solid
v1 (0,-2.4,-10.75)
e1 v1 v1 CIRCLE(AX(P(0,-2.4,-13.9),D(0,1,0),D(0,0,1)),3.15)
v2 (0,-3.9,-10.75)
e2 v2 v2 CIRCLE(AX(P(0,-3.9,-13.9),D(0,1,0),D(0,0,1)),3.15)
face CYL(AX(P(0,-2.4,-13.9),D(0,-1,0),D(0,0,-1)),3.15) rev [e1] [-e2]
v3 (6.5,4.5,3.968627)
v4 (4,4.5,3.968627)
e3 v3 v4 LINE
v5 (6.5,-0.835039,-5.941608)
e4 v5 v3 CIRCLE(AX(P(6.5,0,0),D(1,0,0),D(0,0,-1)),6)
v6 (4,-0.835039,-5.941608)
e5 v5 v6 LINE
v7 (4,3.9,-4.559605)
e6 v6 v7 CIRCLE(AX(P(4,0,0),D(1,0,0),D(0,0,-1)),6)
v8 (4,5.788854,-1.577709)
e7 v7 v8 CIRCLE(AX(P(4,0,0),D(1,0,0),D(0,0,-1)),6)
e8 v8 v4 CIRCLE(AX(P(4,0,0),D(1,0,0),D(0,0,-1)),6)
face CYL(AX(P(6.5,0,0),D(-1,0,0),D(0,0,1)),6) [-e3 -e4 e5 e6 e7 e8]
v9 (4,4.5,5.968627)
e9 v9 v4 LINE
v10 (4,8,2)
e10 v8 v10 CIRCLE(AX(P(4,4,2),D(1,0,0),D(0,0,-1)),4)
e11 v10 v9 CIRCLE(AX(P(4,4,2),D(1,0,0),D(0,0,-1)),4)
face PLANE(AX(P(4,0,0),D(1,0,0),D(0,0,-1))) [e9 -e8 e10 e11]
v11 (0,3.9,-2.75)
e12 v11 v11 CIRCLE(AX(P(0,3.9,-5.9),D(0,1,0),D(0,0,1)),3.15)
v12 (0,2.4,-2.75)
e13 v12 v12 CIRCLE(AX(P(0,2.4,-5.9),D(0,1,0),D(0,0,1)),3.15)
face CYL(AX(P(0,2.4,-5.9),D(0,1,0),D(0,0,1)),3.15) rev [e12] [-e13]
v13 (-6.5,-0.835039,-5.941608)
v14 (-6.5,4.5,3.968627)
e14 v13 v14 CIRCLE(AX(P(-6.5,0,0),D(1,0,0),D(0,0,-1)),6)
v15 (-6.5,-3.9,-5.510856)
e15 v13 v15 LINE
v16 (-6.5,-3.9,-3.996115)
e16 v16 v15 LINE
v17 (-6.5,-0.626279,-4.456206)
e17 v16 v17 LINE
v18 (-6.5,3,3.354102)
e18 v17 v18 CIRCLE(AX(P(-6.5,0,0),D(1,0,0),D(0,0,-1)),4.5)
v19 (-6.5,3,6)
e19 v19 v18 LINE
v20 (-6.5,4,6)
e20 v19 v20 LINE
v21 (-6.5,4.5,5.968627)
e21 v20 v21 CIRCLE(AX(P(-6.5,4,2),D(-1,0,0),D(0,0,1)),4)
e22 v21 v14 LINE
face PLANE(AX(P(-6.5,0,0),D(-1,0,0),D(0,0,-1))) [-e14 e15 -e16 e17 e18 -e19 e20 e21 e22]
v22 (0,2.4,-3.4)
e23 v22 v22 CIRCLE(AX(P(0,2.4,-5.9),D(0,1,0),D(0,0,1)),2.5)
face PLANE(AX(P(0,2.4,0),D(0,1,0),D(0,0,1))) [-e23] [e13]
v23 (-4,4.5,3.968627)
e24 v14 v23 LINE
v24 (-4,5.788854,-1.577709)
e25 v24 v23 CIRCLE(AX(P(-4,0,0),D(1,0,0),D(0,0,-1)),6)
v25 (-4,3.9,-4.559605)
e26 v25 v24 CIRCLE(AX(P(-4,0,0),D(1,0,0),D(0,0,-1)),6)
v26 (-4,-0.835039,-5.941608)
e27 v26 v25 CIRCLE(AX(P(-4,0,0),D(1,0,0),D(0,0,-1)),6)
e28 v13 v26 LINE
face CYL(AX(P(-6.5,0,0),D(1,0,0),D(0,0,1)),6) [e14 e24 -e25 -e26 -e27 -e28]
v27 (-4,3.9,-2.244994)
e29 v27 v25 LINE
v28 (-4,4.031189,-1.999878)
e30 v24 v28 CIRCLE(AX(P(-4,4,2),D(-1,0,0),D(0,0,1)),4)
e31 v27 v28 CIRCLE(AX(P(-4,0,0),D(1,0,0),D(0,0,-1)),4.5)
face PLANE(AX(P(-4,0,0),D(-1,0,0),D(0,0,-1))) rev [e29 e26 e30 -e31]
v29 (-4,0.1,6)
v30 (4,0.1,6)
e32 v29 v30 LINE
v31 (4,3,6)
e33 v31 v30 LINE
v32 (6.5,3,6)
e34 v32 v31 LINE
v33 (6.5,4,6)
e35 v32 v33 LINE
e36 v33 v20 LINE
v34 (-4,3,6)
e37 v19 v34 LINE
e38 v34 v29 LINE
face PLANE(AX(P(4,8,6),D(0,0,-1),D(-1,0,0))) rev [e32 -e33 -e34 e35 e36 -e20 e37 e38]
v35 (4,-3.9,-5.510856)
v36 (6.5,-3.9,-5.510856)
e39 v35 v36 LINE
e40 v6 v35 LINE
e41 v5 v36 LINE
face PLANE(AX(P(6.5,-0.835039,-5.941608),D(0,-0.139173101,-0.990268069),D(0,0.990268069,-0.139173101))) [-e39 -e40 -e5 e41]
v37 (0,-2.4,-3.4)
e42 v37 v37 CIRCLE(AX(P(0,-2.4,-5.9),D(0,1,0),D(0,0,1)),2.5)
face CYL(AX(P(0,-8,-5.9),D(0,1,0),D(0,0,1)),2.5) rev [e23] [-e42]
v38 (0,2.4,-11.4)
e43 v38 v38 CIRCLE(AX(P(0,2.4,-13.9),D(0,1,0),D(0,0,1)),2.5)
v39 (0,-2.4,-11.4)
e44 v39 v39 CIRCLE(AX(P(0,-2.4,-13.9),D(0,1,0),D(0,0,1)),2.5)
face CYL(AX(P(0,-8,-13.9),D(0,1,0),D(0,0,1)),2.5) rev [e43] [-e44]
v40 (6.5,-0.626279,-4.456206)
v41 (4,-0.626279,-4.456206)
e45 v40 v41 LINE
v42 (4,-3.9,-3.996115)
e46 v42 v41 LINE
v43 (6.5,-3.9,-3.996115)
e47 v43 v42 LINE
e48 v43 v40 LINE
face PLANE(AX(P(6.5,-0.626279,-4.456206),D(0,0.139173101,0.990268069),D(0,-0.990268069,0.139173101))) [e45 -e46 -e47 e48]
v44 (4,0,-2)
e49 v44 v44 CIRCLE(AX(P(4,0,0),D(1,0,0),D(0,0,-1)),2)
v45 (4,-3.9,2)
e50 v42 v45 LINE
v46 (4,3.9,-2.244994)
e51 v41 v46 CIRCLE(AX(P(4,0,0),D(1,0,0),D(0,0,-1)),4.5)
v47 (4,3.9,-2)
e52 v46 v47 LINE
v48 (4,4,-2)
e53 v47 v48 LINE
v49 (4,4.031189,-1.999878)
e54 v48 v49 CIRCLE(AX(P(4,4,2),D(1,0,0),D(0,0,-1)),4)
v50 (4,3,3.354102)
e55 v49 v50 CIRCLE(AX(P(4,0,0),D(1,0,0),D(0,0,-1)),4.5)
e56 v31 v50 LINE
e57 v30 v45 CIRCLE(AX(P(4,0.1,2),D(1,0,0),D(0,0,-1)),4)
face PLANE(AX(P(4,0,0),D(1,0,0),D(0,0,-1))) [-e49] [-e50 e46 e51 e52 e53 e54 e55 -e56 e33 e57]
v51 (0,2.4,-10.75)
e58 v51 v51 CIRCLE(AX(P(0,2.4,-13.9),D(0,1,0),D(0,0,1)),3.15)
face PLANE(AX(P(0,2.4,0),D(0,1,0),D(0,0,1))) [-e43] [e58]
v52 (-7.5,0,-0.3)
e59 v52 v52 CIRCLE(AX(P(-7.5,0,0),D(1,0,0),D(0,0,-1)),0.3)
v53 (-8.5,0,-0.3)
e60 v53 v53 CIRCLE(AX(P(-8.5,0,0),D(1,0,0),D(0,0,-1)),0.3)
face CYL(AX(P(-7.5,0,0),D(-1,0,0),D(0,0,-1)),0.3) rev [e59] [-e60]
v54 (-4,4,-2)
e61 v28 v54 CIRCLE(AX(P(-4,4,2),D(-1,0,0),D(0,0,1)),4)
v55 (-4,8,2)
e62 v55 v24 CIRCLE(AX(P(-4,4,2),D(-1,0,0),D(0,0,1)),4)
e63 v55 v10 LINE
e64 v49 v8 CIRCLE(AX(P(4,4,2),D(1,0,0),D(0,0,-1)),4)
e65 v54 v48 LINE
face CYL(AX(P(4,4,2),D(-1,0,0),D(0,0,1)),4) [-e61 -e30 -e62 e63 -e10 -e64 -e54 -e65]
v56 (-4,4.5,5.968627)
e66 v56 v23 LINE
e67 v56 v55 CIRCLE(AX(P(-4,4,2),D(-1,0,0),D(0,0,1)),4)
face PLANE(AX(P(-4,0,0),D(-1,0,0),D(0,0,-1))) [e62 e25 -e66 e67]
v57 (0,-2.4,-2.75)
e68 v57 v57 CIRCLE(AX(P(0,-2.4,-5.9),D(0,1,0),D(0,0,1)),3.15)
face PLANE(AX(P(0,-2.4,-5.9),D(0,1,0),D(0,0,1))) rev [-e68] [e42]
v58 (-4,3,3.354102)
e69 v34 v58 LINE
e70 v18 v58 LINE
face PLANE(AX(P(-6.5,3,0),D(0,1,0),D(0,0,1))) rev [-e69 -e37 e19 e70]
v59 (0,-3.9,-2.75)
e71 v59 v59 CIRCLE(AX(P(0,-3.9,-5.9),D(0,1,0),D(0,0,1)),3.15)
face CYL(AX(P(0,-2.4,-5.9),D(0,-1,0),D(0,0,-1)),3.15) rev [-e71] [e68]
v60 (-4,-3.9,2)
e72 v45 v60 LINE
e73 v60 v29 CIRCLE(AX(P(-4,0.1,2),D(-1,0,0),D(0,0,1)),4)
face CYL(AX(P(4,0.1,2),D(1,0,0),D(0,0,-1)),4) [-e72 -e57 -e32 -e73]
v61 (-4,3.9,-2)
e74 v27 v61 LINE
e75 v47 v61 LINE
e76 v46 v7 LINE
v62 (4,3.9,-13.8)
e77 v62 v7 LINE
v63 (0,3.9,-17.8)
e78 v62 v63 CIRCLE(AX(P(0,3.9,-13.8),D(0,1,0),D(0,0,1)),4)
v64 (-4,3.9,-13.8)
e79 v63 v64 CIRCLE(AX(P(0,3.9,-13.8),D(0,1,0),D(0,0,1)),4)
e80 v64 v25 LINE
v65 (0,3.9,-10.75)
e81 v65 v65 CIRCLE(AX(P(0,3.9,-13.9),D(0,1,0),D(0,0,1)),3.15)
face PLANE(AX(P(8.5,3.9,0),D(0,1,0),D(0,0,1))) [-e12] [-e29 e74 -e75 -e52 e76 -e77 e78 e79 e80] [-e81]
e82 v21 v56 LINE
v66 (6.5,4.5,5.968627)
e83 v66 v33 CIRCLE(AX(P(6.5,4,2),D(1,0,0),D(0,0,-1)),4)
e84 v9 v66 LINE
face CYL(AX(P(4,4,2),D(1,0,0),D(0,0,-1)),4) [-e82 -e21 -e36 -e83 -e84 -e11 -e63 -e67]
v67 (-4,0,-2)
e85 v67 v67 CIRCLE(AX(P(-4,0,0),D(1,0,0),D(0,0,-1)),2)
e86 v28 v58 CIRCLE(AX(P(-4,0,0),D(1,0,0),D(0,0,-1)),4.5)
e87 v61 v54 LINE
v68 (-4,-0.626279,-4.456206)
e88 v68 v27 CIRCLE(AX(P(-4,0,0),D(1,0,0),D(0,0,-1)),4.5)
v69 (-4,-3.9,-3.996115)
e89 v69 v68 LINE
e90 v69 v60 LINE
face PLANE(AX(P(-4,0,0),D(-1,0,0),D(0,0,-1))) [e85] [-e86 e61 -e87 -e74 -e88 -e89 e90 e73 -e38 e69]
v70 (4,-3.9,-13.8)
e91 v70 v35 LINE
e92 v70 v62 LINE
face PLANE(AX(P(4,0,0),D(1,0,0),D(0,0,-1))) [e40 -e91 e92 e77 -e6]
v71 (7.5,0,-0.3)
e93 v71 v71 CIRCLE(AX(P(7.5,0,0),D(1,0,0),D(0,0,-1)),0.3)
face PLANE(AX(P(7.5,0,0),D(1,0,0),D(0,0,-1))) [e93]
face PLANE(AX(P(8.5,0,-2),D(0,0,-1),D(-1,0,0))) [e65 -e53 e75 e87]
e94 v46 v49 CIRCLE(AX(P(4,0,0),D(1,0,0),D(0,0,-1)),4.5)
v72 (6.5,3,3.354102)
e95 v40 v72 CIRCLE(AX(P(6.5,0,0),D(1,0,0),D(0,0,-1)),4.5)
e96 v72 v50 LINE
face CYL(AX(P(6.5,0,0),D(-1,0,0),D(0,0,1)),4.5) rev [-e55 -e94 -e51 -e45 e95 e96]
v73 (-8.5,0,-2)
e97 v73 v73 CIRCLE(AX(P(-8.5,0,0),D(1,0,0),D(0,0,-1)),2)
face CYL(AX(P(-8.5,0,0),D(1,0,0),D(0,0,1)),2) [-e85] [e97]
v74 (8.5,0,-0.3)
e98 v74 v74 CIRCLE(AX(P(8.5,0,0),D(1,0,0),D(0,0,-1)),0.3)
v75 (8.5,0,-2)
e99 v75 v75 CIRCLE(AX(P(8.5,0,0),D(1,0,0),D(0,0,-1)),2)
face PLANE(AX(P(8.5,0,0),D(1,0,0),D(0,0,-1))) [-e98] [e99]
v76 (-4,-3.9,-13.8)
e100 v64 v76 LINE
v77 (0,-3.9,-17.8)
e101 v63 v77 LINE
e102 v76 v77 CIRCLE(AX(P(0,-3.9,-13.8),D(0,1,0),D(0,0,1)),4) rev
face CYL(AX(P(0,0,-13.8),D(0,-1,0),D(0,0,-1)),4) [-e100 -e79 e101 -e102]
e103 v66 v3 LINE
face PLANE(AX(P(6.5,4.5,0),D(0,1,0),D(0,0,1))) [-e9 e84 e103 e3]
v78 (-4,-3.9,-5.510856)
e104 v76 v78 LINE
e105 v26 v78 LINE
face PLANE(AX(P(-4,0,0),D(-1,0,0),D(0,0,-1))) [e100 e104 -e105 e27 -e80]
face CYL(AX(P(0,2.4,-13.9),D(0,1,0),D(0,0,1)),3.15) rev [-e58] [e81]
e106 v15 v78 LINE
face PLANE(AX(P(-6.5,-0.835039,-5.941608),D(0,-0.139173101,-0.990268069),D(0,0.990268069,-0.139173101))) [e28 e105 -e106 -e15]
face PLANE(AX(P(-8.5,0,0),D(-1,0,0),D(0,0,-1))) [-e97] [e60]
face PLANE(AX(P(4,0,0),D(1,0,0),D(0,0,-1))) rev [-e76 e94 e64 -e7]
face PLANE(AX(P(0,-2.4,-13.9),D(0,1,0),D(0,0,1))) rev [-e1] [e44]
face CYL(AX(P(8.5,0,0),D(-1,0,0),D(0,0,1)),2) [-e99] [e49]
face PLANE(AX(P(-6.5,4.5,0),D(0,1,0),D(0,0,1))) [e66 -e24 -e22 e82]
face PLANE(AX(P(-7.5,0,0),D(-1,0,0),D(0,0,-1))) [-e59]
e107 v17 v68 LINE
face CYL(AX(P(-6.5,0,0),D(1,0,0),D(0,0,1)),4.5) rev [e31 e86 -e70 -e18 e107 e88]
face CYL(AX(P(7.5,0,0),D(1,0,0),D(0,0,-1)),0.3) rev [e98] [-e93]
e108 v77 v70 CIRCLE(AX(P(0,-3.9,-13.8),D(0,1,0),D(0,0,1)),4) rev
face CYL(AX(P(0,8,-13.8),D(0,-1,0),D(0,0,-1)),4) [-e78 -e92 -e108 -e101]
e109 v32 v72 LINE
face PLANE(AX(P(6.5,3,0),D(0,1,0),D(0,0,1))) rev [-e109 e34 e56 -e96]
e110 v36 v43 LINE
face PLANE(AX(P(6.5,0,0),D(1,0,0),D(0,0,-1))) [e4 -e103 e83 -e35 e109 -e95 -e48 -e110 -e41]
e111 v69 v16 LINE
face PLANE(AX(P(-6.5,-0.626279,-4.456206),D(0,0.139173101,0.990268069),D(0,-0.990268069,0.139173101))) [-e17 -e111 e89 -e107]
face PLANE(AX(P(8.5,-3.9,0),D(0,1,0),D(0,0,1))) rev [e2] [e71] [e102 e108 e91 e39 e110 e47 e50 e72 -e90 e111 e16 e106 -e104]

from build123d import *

# Parameters (mm, degrees)
SKETCH_2_W               = 23.8
SKETCH_2_H               = 16
EXTRUDE_1_DEPTH          = 4
EXTRUDE_START            = 4
EXTRUDE_3_DEPTH          = 4.5
SKETCH_5_R               = 0.3
CUT_EXTRUDE_10_DEPTH     = 1
CUT_EXTRUDE_5_DEPTH      = 22.285910833
EXTRUDE_2_DEPTH          = 2.5
CUT_EXTRUDE_6_DEPTH      = 24.036926878
CUT_EXTRUDE_6_DEPTH_BACK = 24.036926878
CUT_EXTRUDE_7_DEPTH      = 1.5
CUT_EXTRUDE_START        = -6.3
CUT_EXTRUDE_8_DEPTH      = 1.5
CUT_EXTRUDE_9_DEPTH      = 22.285910833
CUT_EXTRUDE_9_DEPTH_BACK = 22.285910833
SKETCH_4_W               = 11.51085618
SKETCH_4_H               = 4.1
FILLET_1_R               = 4


with BuildPart() as part:
    # 草图2 → 凸台-拉伸1 (new body)
    with BuildSketch(Plane(origin=(0, 0, 0), x_dir=(0, 0, -1), z_dir=(1, 0, 0))):
        with Locations((5.9, 0)):
            Rectangle(SKETCH_2_W, SKETCH_2_H)
    extrude(amount=EXTRUDE_1_DEPTH)

    # 草图2<10> → 凸台-拉伸3 (add)
    with BuildSketch(Plane(origin=(0, 0, 0), x_dir=(0, 0, -1), z_dir=(1, 0, 0)).offset(EXTRUDE_START)):
        with BuildLine():
            ThreePointArc((0, -2), (1.414213562, -1.414213562), (2, 0))
            Line((2, 0), (0, 0))
            Line((0, 0), (0, -2))
        make_face()
        with BuildLine():
            Line((0, 0), (2, 0))
            ThreePointArc((2, 0), (1.414213562, 1.414213562), (0, 2))
            Line((0, 2), (0, 0))
        make_face()
        with BuildLine():
            Line((0, -2), (0, 0))
            Line((0, 0), (-2, 0))
            ThreePointArc((-2, 0), (-1.414213562, -1.414213562), (0, -2))
        make_face()
        with BuildLine():
            Line((-2, 0), (0, 0))
            Line((0, 0), (0, 2))
            ThreePointArc((0, 2), (-1.414213562, 1.414213562), (-2, 0))
        make_face()
    extrude(amount=EXTRUDE_3_DEPTH)

    # 草图5 → 切除-拉伸10 (cut)
    with BuildSketch(Plane(origin=(8.5, 0, 0), x_dir=(0, 0, -1), z_dir=(1, 0, 0))):
        Circle(SKETCH_5_R)
    extrude(amount=-CUT_EXTRUDE_10_DEPTH, mode=Mode.SUBTRACT)

    # 草图2<9> → 切除-拉伸5 (cut, through all)
    with BuildSketch(Plane(origin=(0, 0, 0), x_dir=(0, 0, -1), z_dir=(1, 0, 0))):
        with BuildLine():
            ThreePointArc((2.244994432, 3.9), (2.123509625, 3.96745597), (2, 4.031128874))
            Line((2, 4.031128874), (2, 3.9))
            Line((2, 3.9), (2.244994432, 3.9))
        make_face()
        with BuildLine():
            ThreePointArc((4.559605246, 3.9), (3.39539975, 4.946843493), (2, 5.656854249))
            Line((2, 5.656854249), (2, 4.031128874))
            ThreePointArc((2, 4.031128874), (2.123509625, 3.96745597), (2.244994432, 3.9))
            Line((2.244994432, 3.9), (4.559605246, 3.9))
        make_face()
        with BuildLine():
            Line((17.8, 8), (2, 8))
            Line((2, 8), (2, 5.656854249))
            ThreePointArc((2, 5.656854249), (3.39539975, 4.946843493), (4.559605246, 3.9))
            Line((4.559605246, 3.9), (17.8, 3.9))
            Line((17.8, 3.9), (17.8, 8))
        make_face()
        with BuildLine():
            Line((2, -4.031128874), (2, -5.656854249))
            ThreePointArc((2, -5.656854249), (3.002792751, -5.194539026), (3.903880188, -4.556283516))
            Line((3.903880188, -4.556283516), (3.996114821, -3.9))
            Line((3.996114821, -3.9), (2.244994432, -3.9))
            ThreePointArc((2.244994432, -3.9), (2.123509625, -3.96745597), (2, -4.031128874))
        make_face()
        with BuildLine():
            ThreePointArc((3.903880188, -4.556283516), (3.002792751, -5.194539026), (2, -5.656854249))
            Line((2, -5.656854249), (2, -8))
            Line((2, -8), (3.419897399, -8))
            Line((3.419897399, -8), (3.903880188, -4.556283516))
        make_face()
        with BuildLine():
            ThreePointArc((3.903880188, -4.556283516), (4.244446187, -4.240834418), (4.559605246, -3.9))
            Line((4.559605246, -3.9), (3.996114821, -3.9))
            Line((3.996114821, -3.9), (3.903880188, -4.556283516))
        make_face()
        with BuildLine():
            Line((4.934638757, -8), (5.51085618, -3.9))
            Line((5.51085618, -3.9), (4.559605246, -3.9))
            ThreePointArc((4.559605246, -3.9), (4.244446187, -4.240834418), (3.903880188, -4.556283516))
            Line((3.903880188, -4.556283516), (3.419897399, -8))
            Line((3.419897399, -8), (4.934638757, -8))
        make_face()
        Polygon((17.8, -8), (17.8, -3.9), (5.51085618, -3.9), (4.934638757, -8), align=None)
    extrude(amount=CUT_EXTRUDE_5_DEPTH, mode=Mode.SUBTRACT)

    # 草图2<4> → 凸台-拉伸2 (add)
    with BuildSketch(Plane(origin=(0, 0, 0), x_dir=(0, 0, -1), z_dir=(1, 0, 0)).offset(EXTRUDE_START)):
        with BuildLine():
            Line((4.934638757, -8), (5.51085618, -3.9))
            Line((5.51085618, -3.9), (4.559605246, -3.9))
            ThreePointArc((4.559605246, -3.9), (4.244446187, -4.240834418), (3.903880188, -4.556283516))
            Line((3.903880188, -4.556283516), (3.419897399, -8))
            Line((3.419897399, -8), (4.934638757, -8))
        make_face()
        with BuildLine():
            Line((4.559605246, -3.9), (3.996114821, -3.9))
            Line((3.996114821, -3.9), (3.903880188, -4.556283516))
            ThreePointArc((3.903880188, -4.556283516), (4.244446187, -4.240834418), (4.559605246, -3.9))
        make_face()
        with BuildLine():
            Line((6, 0), (4.5, 0))
            ThreePointArc((4.5, 0), (4.489038226, -0.313904132), (4.456206309, -0.626278954))
            Line((4.456206309, -0.626278954), (3.996114821, -3.9))
            Line((3.996114821, -3.9), (4.559605246, -3.9))
            ThreePointArc((4.559605246, -3.9), (5.469677245, -2.466299016), (5.941608412, -0.835038606))
            ThreePointArc((5.941608412, -0.835038606), (5.985384302, -0.418538842), (6, 0))
        make_face()
        with BuildLine():
            Line((5.51085618, -3.9), (5.941608412, -0.835038606))
            ThreePointArc((5.941608412, -0.835038606), (5.469677245, -2.466299016), (4.559605246, -3.9))
            Line((4.559605246, -3.9), (5.51085618, -3.9))
        make_face()
        with BuildLine():
            ThreePointArc((2.244994432, 3.9), (3.895669066, 2.252501394), (4.5, 0))
            Line((4.5, 0), (6, 0))
            ThreePointArc((6, 0), (5.628393709, 2.078745839), (4.559605246, 3.9))
            Line((4.559605246, 3.9), (2.244994432, 3.9))
        make_face()
        with BuildLine():
            ThreePointArc((2, 4.031128874), (2.123509625, 3.96745597), (2.244994432, 3.9))
            Line((2.244994432, 3.9), (4.559605246, 3.9))
            ThreePointArc((4.559605246, 3.9), (3.39539975, 4.946843493), (2, 5.656854249))
            Line((2, 5.656854249), (2, 4.031128874))
        make_face()
        with BuildLine():
            ThreePointArc((0, 4.5), (1.027112473, 4.38121444), (2, 4.031128874))
            Line((2, 4.031128874), (2, 5.656854249))
            ThreePointArc((2, 5.656854249), (-1.141687773, 5.890377664), (-3.968626967, 4.5))
            Line((-3.968626967, 4.5), (0, 4.5))
        make_face()
        with BuildLine():
            ThreePointArc((-3.354101966, 3), (-1.837117307, 4.107919181), (0, 4.5))
            Line((0, 4.5), (-3.968626967, 4.5))
            ThreePointArc((-3.968626967, 4.5), (-4.643360347, 3.799895352), (-5.196152423, 3))
            Line((-5.196152423, 3), (-3.354101966, 3))
        make_face()
        with BuildLine():
            ThreePointArc((-5.196152423, 3), (-4.643360347, 3.799895352), (-3.968626967, 4.5))
            Line((-3.968626967, 4.5), (-6, 4.5))
            Line((-6, 4.5), (-6, 3))
            Line((-6, 3), (-5.196152423, 3))
        make_face()
    extrude(amount=EXTRUDE_2_DEPTH)

    # 镜向1: part across plane


with BuildPart() as part_1:
    add(part.part)
    add(part.part.mirror(Plane(origin=(0, 0, 0), x_dir=(0, 0, 1), z_dir=(1, 0, 0))))

    # 草图3 → 切除-拉伸6 (cut, two sides: drawn at the far end of the back side and taken through both)
    with BuildSketch(Plane(origin=(0, 3.9, 0), x_dir=(1, 0, 0), z_dir=(0, 1, 0)).offset(-CUT_EXTRUDE_6_DEPTH_BACK)):
        with BuildLine():
            ThreePointArc((2.5, 13.9), (1.767766953, 15.667766953), (0, 16.4))
            Line((0, 16.4), (0, 11.4))
            ThreePointArc((0, 11.4), (1.767766953, 12.132233047), (2.5, 13.9))
        make_face()
        with BuildLine():
            Line((0, 11.4), (0, 16.4))
            ThreePointArc((0, 16.4), (-2.5, 13.9), (0, 11.4))
        make_face()
        with BuildLine():
            ThreePointArc((2.5, 5.9), (1.767766953, 7.667766953), (0, 8.4))
            Line((0, 8.4), (0, 3.4))
            ThreePointArc((0, 3.4), (1.767766953, 4.132233047), (2.5, 5.9))
        make_face()
        with BuildLine():
            Line((0, 3.4), (0, 8.4))
            ThreePointArc((0, 8.4), (-2.5, 5.9), (0, 3.4))
        make_face()
    extrude(amount=CUT_EXTRUDE_6_DEPTH + CUT_EXTRUDE_6_DEPTH_BACK, mode=Mode.SUBTRACT)

    # 草图3<4> → 切除-拉伸7 (cut)
    with BuildSketch(Plane(origin=(0, 3.9, 0), x_dir=(1, 0, 0), z_dir=(0, 1, 0))):
        with BuildLine():
            ThreePointArc((3.15, 5.9), (2.227386361, 8.127386361), (0, 9.05))
            Line((0, 9.05), (0, 8.4))
            ThreePointArc((0, 8.4), (1.767766953, 7.667766953), (2.5, 5.9))
            ThreePointArc((2.5, 5.9), (1.767766953, 4.132233047), (0, 3.4))
            Line((0, 3.4), (0, 2.75))
            ThreePointArc((0, 2.75), (2.227386361, 3.672613639), (3.15, 5.9))
        make_face()
        with BuildLine():
            Line((0, 8.4), (0, 9.05))
            ThreePointArc((0, 9.05), (-3.15, 5.9), (0, 2.75))
            Line((0, 2.75), (0, 3.4))
            ThreePointArc((0, 3.4), (-2.5, 5.9), (0, 8.4))
        make_face()
        with BuildLine():
            ThreePointArc((3.15, 13.9), (2.227386361, 16.127386361), (0, 17.05))
            Line((0, 17.05), (0, 16.4))
            ThreePointArc((0, 16.4), (1.767766953, 15.667766953), (2.5, 13.9))
            ThreePointArc((2.5, 13.9), (1.767766953, 12.132233047), (0, 11.4))
            Line((0, 11.4), (0, 10.75))
            ThreePointArc((0, 10.75), (2.227386361, 11.672613639), (3.15, 13.9))
        make_face()
        with BuildLine():
            Line((0, 16.4), (0, 17.05))
            ThreePointArc((0, 17.05), (-3.15, 13.9), (0, 10.75))
            Line((0, 10.75), (0, 11.4))
            ThreePointArc((0, 11.4), (-2.5, 13.9), (0, 16.4))
        make_face()
    extrude(amount=-CUT_EXTRUDE_7_DEPTH, mode=Mode.SUBTRACT)

    # 草图3<5> → 切除-拉伸8 (cut)
    with BuildSketch(Plane(origin=(0, 3.9, 0), x_dir=(1, 0, 0), z_dir=(0, 1, 0)).offset(CUT_EXTRUDE_START)):
        with BuildLine():
            ThreePointArc((3.15, 5.9), (2.227386361, 8.127386361), (0, 9.05))
            Line((0, 9.05), (0, 8.4))
            ThreePointArc((0, 8.4), (1.767766953, 7.667766953), (2.5, 5.9))
            ThreePointArc((2.5, 5.9), (1.767766953, 4.132233047), (0, 3.4))
            Line((0, 3.4), (0, 2.75))
            ThreePointArc((0, 2.75), (2.227386361, 3.672613639), (3.15, 5.9))
        make_face()
        with BuildLine():
            Line((0, 8.4), (0, 9.05))
            ThreePointArc((0, 9.05), (-3.15, 5.9), (0, 2.75))
            Line((0, 2.75), (0, 3.4))
            ThreePointArc((0, 3.4), (-2.5, 5.9), (0, 8.4))
        make_face()
        with BuildLine():
            ThreePointArc((3.15, 13.9), (2.227386361, 16.127386361), (0, 17.05))
            Line((0, 17.05), (0, 16.4))
            ThreePointArc((0, 16.4), (1.767766953, 15.667766953), (2.5, 13.9))
            ThreePointArc((2.5, 13.9), (1.767766953, 12.132233047), (0, 11.4))
            Line((0, 11.4), (0, 10.75))
            ThreePointArc((0, 10.75), (2.227386361, 11.672613639), (3.15, 13.9))
        make_face()
        with BuildLine():
            Line((0, 16.4), (0, 17.05))
            ThreePointArc((0, 17.05), (-3.15, 13.9), (0, 10.75))
            Line((0, 10.75), (0, 11.4))
            ThreePointArc((0, 11.4), (-2.5, 13.9), (0, 16.4))
        make_face()
    extrude(amount=-CUT_EXTRUDE_8_DEPTH, mode=Mode.SUBTRACT)

    # 草图4 → 切除-拉伸9 (cut, two sides: drawn at the far end of the back side and taken through both)
    with BuildSketch(Plane(origin=(0, 0, 0), x_dir=(0, 0, -1), z_dir=(1, 0, 0)).offset(-CUT_EXTRUDE_9_DEPTH_BACK)):
        with Locations((-0.24457191, -5.95)):
            Rectangle(SKETCH_4_W, SKETCH_4_H)
    extrude(amount=CUT_EXTRUDE_9_DEPTH + CUT_EXTRUDE_9_DEPTH_BACK, mode=Mode.SUBTRACT)

    # 圆角1
    # the kernel refuses this fillet: 4 mm, written as the material it takes off along each edge
    with BuildSketch(Plane(origin=(-4, 13.9, -17.8), x_dir=(1, 0, 0), z_dir=(0, -1, 0))) as fillet_1_piece_1:
        with BuildLine():
            CenterArc((FILLET_1_R, FILLET_1_R), FILLET_1_R, 180, 90)
            Line((0, FILLET_1_R), (0, 0))
            Line((0, 0), (FILLET_1_R, 0))
        make_face()
    extrude(amount=27.8, mode=Mode.SUBTRACT)
    with BuildSketch(Plane(origin=(14, -3.9, 6), x_dir=(0, 0, -1), z_dir=(-1, 0, 0)), Plane(origin=(-14, 8, 6), x_dir=(0, 0, -1), z_dir=(1, 0, 0))) as fillet_1_piece_2:
        with BuildLine():
            CenterArc((FILLET_1_R, -FILLET_1_R), FILLET_1_R, 90, 90)
            Line((0, -FILLET_1_R), (0, 0))
            Line((0, 0), (FILLET_1_R, 0))
        make_face()
    extrude(amount=28, mode=Mode.SUBTRACT)
    with BuildSketch(Plane(origin=(4, 13.9, -17.8), x_dir=(-1, 0, 0), z_dir=(0, -1, 0))) as fillet_1_piece_3:
        with BuildLine():
            CenterArc((FILLET_1_R, -FILLET_1_R), FILLET_1_R, 90, 90)
            Line((0, -FILLET_1_R), (0, 0))
            Line((0, 0), (FILLET_1_R, 0))
        make_face()
    extrude(amount=27.8, mode=Mode.SUBTRACT)
    with BuildSketch(Plane(origin=(4, 8, -2), x_dir=(0, 0, 1), z_dir=(-1, 0, 0))) as fillet_1_piece_4:
        with BuildLine():
            CenterArc((FILLET_1_R, -FILLET_1_R), FILLET_1_R, 90, 90)
            Line((0, -FILLET_1_R), (0, 0))
            Line((0, 0), (FILLET_1_R, 0))
        make_face()
    extrude(amount=8, mode=Mode.SUBTRACT)


solid = part_1.part
